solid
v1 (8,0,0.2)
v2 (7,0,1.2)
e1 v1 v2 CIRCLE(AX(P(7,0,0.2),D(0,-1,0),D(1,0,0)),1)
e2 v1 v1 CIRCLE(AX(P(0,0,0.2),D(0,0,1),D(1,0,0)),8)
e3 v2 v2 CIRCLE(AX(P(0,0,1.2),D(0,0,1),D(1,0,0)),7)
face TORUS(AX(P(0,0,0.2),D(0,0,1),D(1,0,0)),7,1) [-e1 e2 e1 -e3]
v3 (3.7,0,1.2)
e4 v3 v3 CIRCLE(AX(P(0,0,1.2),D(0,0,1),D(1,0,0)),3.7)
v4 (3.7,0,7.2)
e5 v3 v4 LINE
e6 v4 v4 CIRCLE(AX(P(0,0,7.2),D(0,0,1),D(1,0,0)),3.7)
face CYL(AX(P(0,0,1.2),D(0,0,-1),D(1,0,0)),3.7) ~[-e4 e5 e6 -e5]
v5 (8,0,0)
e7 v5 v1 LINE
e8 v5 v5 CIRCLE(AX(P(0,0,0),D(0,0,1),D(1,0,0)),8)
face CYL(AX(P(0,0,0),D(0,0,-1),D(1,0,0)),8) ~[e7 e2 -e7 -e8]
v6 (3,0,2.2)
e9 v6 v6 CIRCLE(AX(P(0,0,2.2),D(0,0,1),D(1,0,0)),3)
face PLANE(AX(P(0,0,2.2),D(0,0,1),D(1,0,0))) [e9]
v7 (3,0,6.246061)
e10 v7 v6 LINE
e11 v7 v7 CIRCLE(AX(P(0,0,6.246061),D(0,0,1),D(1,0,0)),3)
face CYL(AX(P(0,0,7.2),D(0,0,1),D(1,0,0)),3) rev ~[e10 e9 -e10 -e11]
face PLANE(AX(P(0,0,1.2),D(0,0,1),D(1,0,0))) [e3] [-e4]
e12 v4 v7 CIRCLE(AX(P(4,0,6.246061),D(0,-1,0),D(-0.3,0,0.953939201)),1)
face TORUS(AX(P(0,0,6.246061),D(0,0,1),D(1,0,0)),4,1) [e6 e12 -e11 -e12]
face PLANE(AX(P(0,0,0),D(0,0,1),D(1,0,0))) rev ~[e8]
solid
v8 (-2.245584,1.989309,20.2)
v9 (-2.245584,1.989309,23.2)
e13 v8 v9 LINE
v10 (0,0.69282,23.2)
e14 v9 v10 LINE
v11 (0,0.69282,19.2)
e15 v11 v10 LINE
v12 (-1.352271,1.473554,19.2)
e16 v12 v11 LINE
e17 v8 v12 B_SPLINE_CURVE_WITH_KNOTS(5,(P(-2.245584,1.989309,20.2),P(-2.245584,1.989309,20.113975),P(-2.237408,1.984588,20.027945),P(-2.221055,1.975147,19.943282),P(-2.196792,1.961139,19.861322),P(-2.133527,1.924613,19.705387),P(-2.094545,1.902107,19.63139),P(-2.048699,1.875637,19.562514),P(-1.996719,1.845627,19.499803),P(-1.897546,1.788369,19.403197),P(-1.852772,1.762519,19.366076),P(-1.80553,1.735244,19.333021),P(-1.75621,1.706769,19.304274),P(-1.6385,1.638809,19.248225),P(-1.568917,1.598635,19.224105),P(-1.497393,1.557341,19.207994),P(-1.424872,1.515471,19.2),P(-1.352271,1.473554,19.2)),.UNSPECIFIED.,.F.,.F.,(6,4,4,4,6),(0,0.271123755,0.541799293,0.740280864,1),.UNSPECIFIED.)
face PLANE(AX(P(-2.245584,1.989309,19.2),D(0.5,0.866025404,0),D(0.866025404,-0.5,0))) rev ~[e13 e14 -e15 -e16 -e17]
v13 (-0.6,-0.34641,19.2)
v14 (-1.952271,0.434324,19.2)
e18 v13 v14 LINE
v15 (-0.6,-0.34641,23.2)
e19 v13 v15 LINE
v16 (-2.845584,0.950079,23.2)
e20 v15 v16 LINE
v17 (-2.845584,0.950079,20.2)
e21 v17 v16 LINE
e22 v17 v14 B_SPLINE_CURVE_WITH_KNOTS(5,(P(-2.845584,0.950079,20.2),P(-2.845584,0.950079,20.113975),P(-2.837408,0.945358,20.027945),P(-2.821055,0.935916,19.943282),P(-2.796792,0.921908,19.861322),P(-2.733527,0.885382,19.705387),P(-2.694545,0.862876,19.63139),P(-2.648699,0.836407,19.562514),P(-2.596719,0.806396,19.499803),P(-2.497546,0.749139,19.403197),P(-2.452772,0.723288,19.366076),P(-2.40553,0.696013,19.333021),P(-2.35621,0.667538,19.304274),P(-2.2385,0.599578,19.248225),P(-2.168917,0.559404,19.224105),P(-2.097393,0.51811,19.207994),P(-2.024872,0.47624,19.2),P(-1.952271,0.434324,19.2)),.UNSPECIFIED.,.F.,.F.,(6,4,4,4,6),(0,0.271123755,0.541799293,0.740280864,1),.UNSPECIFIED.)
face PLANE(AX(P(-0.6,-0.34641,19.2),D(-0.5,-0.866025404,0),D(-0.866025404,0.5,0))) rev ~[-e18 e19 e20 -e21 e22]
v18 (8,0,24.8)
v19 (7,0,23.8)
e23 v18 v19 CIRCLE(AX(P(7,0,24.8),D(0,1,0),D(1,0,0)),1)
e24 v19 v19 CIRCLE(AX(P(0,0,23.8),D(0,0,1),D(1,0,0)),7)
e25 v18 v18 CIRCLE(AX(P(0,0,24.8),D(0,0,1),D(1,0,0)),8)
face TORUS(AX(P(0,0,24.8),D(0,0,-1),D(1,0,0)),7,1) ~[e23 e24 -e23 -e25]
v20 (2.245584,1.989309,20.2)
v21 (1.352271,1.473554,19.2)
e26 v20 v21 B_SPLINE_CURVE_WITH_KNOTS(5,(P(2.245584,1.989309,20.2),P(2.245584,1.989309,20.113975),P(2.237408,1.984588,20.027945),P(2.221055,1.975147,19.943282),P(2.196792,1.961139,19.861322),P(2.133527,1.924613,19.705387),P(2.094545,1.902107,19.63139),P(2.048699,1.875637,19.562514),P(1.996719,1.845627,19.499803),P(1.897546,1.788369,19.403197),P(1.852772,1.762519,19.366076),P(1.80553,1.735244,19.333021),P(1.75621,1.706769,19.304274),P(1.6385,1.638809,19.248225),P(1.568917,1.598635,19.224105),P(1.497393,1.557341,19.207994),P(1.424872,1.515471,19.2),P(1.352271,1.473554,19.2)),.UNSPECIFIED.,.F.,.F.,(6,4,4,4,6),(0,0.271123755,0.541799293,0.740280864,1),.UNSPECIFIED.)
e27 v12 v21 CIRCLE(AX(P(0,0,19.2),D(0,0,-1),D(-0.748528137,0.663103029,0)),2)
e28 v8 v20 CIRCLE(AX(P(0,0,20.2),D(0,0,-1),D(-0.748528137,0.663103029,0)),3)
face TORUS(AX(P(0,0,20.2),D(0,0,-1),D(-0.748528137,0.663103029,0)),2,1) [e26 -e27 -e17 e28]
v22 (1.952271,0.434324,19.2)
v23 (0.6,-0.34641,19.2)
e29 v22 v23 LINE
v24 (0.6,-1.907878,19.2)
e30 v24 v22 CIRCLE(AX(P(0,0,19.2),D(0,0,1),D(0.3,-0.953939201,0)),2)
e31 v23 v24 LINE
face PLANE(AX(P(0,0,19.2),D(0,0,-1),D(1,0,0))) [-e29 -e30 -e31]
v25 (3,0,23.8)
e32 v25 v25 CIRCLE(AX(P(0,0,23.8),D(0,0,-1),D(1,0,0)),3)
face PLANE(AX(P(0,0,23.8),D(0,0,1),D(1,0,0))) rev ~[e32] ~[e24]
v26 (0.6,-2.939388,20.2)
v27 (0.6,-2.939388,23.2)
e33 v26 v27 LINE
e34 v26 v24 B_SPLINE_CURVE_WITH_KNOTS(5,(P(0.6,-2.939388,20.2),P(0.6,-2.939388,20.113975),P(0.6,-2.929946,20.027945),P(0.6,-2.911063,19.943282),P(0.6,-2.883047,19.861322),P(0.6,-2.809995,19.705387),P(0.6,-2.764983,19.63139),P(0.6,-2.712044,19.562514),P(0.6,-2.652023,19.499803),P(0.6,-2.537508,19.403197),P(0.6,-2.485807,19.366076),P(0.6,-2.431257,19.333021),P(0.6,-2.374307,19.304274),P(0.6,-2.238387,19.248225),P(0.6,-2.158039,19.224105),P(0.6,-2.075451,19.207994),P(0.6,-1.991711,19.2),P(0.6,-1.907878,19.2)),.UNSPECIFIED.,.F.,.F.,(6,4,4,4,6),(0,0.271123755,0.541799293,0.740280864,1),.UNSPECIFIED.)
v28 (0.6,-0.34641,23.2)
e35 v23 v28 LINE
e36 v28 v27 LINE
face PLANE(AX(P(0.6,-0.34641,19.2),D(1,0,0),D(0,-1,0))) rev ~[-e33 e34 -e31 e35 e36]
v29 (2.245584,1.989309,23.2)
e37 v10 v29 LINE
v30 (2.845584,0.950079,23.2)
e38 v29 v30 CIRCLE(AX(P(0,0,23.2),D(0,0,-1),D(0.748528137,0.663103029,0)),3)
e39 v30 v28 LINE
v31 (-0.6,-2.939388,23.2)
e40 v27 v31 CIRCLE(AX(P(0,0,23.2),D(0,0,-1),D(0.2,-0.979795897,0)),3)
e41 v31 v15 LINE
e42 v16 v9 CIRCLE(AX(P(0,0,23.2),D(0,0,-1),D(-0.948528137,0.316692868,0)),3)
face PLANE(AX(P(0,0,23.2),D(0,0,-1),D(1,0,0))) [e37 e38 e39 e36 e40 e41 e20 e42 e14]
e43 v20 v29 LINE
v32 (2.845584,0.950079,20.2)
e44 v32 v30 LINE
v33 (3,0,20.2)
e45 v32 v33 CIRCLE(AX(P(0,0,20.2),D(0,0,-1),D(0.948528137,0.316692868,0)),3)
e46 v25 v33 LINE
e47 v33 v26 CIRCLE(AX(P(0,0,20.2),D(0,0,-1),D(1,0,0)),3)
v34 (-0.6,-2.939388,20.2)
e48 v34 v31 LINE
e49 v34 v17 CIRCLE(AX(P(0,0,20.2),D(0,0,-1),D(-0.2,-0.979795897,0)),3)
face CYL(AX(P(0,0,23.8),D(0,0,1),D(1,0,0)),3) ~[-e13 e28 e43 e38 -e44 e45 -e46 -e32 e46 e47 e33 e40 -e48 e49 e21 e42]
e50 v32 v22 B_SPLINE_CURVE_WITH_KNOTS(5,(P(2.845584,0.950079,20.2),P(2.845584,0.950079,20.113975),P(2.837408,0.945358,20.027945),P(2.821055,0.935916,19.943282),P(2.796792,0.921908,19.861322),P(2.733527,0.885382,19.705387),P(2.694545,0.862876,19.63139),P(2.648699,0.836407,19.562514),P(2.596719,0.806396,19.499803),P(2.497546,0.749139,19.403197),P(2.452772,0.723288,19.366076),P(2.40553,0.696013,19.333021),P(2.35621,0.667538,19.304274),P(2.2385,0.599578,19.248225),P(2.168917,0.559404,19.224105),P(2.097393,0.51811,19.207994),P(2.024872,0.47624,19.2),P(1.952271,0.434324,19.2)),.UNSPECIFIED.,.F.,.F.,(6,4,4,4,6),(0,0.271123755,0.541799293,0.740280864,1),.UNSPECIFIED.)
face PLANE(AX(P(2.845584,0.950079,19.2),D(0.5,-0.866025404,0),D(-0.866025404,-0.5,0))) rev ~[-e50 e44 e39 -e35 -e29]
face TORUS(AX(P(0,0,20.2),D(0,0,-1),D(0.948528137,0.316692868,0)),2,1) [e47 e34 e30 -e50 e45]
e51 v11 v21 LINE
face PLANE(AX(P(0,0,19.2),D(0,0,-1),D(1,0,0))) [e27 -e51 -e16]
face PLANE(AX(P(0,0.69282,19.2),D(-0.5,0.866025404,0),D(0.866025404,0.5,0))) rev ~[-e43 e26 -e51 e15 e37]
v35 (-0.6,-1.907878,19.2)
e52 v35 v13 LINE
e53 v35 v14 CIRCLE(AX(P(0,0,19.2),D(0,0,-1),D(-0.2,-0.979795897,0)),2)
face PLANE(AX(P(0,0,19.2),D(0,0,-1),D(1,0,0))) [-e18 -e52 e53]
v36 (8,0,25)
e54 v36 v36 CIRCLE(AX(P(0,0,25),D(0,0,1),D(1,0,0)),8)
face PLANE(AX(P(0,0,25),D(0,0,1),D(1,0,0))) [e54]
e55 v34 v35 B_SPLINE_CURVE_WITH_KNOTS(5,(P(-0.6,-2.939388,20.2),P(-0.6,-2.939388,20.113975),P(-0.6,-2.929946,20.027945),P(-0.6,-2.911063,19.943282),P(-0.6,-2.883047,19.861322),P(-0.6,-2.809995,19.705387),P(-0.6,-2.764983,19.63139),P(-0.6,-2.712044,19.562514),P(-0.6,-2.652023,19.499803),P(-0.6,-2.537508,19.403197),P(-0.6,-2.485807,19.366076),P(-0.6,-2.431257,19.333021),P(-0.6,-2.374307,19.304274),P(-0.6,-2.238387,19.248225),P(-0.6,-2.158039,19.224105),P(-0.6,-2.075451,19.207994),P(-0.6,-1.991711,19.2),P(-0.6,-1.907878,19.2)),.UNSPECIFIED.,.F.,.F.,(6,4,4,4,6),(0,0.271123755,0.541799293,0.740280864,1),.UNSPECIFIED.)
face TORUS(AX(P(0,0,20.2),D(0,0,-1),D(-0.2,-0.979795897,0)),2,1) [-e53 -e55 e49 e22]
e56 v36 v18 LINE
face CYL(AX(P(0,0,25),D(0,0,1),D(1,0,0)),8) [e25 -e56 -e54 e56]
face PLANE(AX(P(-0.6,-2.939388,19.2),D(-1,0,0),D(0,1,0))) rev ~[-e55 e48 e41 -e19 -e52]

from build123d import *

# Parameters (mm, degrees)
F0_R       = 8
F1_DEPTH   = 1.2
F2_R       = 3.7
F3_DEPTH   = 6
F4_R       = 3
F5_DEPTH   = 5
F7_R       = 8
F8_DEPTH   = 1.2
F9_R       = 3
F10_DEPTH  = 4.6
F11_R      = 0.6
F12_DEPTH  = 4
F13_2_F1_R = 1
F13_2_F2_R = 1
F13_2_F3_R = 1
F13_2_F4_R = 1


# Not quite as in the source:
# - a fillet or chamfer that OpenCascade refuses, or shapes differently, is made with other operations: its cross-section is extruded or revolved along the edge and cut away or added
# - a feature names something its author has since deleted; it is built from what else it names


with BuildPart() as f1:
    # F0 (on Top) → F1 (new body)
    with BuildSketch(Plane.XY):
        Circle(F0_R)
    extrude(amount=F1_DEPTH)

    # F2 (on face) → F3 (join)
    with BuildSketch(Plane.XY.offset(1.2)):
        Circle(F2_R)
    extrude(amount=F3_DEPTH)

    # F4 (on face) → F5 (cut)
    with BuildSketch(Plane.XY.offset(7.2)):
        Circle(F4_R)
    extrude(amount=-F5_DEPTH, mode=Mode.SUBTRACT)

    # F13: fillet of radius 1 on 2 edges, made by hand

    # F13_s1 → F13_t2 (revolve, cut)
    with BuildSketch(Plane.XZ):
        with BuildLine():
            ThreePointArc((3.7, 7.2), (3.1937742252, 6.8376687769), (3, 6.2460607986))
            Line((3, 6.2460607986), (3, 7.2))
            Line((3, 7.2), (3.7, 7.2))
        make_face()
    revolve(axis=Axis((0, 0, 7.2), (0, 0, 1)), mode=Mode.SUBTRACT)

    # F13_s3 → F13_t4 (revolve, cut)
    with BuildSketch(Plane.XZ):
        with BuildLine():
            ThreePointArc((8, 0.2), (7.7071067812, 0.9071067812), (7, 1.2))
            Line((7, 1.2), (8, 1.2))
            Line((8, 1.2), (8, 0.2))
        make_face()
    revolve(axis=Axis((0, 0, 1.2), (0, 0, 1)), mode=Mode.SUBTRACT)


with BuildPart() as f8:
    # F7 (on offset) → F8 (new body)
    with BuildSketch(Plane.XY.offset(25)):
        Circle(F7_R)
    extrude(amount=-F8_DEPTH)

    # F9 (on face) → F10 (join)
    with BuildSketch(Plane(origin=(0, 0, 23.8), x_dir=(1, 0, 0), z_dir=(0, 0, -1))):
        Circle(F9_R)
    extrude(amount=F10_DEPTH)

    # F11 (on face) → F12 (cut)
    with BuildSketch(Plane(origin=(0, 0, 19.2), x_dir=(1, 0, 0), z_dir=(0, 0, -1))):
        with BuildLine():
            Line((2.8455844123, -0.9500786034), (0.6, 0.3464101615))
            Line((0.6, 0.3464101615), (0.6, 2.9393876913))
            ThreePointArc((0.6, 2.9393876913), (0, 3), (-0.6, 2.9393876913))
            Line((-0.6, 2.9393876913), (-0.6, 0.3464101615))
            Line((-0.6, 0.3464101615), (-2.8455844123, -0.9500786034))
            ThreePointArc((-2.8455844123, -0.9500786034), (-2.5980762114, -1.5), (-2.2455844123, -1.9893090879))
            Line((-2.2455844123, -1.9893090879), (0, -0.692820323))
            Line((0, -0.692820323), (2.2455844123, -1.9893090879))
            ThreePointArc((2.2455844123, -1.9893090879), (2.5980762114, -1.5), (2.8455844123, -0.9500786034))
        make_face()
        Circle(F11_R, mode=Mode.SUBTRACT)
        Circle(F11_R)
    extrude(amount=-F12_DEPTH, mode=Mode.SUBTRACT)

    # F13#2: fillet of radius 1 on 5 edges, made by hand

    # F13_2_f1
    f13_2_f1_edges = [f8.edges().sort_by_distance(p)[0] for p in [
        (-8, 0, 23.8),
    ]]
    fillet(f13_2_f1_edges, radius=F13_2_F1_R)

    # F13_2_f2
    f13_2_f2_edges = [f8.edges().sort_by_distance(p)[0] for p in [
        (2.9611444778, 0.4812726687, 19.2),
        (2.3237900077, -1.8973665961, 19.2),
    ]]
    fillet(f13_2_f2_edges, radius=F13_2_F2_R)

    # F13_2_f3
    f13_2_f3_edges = [f8.edges().sort_by_distance(p)[0] for p in [
        (0, 3, 19.2),
    ]]
    fillet(f13_2_f3_edges, radius=F13_2_F3_R)

    # F13_2_f4
    f13_2_f4_edges = [f8.edges().sort_by_distance(p)[0] for p in [
        (-2.5980762114, -1.5, 19.2),
    ]]
    fillet(f13_2_f4_edges, radius=F13_2_F4_R)


solid = Compound([f1.part, f8.part])
